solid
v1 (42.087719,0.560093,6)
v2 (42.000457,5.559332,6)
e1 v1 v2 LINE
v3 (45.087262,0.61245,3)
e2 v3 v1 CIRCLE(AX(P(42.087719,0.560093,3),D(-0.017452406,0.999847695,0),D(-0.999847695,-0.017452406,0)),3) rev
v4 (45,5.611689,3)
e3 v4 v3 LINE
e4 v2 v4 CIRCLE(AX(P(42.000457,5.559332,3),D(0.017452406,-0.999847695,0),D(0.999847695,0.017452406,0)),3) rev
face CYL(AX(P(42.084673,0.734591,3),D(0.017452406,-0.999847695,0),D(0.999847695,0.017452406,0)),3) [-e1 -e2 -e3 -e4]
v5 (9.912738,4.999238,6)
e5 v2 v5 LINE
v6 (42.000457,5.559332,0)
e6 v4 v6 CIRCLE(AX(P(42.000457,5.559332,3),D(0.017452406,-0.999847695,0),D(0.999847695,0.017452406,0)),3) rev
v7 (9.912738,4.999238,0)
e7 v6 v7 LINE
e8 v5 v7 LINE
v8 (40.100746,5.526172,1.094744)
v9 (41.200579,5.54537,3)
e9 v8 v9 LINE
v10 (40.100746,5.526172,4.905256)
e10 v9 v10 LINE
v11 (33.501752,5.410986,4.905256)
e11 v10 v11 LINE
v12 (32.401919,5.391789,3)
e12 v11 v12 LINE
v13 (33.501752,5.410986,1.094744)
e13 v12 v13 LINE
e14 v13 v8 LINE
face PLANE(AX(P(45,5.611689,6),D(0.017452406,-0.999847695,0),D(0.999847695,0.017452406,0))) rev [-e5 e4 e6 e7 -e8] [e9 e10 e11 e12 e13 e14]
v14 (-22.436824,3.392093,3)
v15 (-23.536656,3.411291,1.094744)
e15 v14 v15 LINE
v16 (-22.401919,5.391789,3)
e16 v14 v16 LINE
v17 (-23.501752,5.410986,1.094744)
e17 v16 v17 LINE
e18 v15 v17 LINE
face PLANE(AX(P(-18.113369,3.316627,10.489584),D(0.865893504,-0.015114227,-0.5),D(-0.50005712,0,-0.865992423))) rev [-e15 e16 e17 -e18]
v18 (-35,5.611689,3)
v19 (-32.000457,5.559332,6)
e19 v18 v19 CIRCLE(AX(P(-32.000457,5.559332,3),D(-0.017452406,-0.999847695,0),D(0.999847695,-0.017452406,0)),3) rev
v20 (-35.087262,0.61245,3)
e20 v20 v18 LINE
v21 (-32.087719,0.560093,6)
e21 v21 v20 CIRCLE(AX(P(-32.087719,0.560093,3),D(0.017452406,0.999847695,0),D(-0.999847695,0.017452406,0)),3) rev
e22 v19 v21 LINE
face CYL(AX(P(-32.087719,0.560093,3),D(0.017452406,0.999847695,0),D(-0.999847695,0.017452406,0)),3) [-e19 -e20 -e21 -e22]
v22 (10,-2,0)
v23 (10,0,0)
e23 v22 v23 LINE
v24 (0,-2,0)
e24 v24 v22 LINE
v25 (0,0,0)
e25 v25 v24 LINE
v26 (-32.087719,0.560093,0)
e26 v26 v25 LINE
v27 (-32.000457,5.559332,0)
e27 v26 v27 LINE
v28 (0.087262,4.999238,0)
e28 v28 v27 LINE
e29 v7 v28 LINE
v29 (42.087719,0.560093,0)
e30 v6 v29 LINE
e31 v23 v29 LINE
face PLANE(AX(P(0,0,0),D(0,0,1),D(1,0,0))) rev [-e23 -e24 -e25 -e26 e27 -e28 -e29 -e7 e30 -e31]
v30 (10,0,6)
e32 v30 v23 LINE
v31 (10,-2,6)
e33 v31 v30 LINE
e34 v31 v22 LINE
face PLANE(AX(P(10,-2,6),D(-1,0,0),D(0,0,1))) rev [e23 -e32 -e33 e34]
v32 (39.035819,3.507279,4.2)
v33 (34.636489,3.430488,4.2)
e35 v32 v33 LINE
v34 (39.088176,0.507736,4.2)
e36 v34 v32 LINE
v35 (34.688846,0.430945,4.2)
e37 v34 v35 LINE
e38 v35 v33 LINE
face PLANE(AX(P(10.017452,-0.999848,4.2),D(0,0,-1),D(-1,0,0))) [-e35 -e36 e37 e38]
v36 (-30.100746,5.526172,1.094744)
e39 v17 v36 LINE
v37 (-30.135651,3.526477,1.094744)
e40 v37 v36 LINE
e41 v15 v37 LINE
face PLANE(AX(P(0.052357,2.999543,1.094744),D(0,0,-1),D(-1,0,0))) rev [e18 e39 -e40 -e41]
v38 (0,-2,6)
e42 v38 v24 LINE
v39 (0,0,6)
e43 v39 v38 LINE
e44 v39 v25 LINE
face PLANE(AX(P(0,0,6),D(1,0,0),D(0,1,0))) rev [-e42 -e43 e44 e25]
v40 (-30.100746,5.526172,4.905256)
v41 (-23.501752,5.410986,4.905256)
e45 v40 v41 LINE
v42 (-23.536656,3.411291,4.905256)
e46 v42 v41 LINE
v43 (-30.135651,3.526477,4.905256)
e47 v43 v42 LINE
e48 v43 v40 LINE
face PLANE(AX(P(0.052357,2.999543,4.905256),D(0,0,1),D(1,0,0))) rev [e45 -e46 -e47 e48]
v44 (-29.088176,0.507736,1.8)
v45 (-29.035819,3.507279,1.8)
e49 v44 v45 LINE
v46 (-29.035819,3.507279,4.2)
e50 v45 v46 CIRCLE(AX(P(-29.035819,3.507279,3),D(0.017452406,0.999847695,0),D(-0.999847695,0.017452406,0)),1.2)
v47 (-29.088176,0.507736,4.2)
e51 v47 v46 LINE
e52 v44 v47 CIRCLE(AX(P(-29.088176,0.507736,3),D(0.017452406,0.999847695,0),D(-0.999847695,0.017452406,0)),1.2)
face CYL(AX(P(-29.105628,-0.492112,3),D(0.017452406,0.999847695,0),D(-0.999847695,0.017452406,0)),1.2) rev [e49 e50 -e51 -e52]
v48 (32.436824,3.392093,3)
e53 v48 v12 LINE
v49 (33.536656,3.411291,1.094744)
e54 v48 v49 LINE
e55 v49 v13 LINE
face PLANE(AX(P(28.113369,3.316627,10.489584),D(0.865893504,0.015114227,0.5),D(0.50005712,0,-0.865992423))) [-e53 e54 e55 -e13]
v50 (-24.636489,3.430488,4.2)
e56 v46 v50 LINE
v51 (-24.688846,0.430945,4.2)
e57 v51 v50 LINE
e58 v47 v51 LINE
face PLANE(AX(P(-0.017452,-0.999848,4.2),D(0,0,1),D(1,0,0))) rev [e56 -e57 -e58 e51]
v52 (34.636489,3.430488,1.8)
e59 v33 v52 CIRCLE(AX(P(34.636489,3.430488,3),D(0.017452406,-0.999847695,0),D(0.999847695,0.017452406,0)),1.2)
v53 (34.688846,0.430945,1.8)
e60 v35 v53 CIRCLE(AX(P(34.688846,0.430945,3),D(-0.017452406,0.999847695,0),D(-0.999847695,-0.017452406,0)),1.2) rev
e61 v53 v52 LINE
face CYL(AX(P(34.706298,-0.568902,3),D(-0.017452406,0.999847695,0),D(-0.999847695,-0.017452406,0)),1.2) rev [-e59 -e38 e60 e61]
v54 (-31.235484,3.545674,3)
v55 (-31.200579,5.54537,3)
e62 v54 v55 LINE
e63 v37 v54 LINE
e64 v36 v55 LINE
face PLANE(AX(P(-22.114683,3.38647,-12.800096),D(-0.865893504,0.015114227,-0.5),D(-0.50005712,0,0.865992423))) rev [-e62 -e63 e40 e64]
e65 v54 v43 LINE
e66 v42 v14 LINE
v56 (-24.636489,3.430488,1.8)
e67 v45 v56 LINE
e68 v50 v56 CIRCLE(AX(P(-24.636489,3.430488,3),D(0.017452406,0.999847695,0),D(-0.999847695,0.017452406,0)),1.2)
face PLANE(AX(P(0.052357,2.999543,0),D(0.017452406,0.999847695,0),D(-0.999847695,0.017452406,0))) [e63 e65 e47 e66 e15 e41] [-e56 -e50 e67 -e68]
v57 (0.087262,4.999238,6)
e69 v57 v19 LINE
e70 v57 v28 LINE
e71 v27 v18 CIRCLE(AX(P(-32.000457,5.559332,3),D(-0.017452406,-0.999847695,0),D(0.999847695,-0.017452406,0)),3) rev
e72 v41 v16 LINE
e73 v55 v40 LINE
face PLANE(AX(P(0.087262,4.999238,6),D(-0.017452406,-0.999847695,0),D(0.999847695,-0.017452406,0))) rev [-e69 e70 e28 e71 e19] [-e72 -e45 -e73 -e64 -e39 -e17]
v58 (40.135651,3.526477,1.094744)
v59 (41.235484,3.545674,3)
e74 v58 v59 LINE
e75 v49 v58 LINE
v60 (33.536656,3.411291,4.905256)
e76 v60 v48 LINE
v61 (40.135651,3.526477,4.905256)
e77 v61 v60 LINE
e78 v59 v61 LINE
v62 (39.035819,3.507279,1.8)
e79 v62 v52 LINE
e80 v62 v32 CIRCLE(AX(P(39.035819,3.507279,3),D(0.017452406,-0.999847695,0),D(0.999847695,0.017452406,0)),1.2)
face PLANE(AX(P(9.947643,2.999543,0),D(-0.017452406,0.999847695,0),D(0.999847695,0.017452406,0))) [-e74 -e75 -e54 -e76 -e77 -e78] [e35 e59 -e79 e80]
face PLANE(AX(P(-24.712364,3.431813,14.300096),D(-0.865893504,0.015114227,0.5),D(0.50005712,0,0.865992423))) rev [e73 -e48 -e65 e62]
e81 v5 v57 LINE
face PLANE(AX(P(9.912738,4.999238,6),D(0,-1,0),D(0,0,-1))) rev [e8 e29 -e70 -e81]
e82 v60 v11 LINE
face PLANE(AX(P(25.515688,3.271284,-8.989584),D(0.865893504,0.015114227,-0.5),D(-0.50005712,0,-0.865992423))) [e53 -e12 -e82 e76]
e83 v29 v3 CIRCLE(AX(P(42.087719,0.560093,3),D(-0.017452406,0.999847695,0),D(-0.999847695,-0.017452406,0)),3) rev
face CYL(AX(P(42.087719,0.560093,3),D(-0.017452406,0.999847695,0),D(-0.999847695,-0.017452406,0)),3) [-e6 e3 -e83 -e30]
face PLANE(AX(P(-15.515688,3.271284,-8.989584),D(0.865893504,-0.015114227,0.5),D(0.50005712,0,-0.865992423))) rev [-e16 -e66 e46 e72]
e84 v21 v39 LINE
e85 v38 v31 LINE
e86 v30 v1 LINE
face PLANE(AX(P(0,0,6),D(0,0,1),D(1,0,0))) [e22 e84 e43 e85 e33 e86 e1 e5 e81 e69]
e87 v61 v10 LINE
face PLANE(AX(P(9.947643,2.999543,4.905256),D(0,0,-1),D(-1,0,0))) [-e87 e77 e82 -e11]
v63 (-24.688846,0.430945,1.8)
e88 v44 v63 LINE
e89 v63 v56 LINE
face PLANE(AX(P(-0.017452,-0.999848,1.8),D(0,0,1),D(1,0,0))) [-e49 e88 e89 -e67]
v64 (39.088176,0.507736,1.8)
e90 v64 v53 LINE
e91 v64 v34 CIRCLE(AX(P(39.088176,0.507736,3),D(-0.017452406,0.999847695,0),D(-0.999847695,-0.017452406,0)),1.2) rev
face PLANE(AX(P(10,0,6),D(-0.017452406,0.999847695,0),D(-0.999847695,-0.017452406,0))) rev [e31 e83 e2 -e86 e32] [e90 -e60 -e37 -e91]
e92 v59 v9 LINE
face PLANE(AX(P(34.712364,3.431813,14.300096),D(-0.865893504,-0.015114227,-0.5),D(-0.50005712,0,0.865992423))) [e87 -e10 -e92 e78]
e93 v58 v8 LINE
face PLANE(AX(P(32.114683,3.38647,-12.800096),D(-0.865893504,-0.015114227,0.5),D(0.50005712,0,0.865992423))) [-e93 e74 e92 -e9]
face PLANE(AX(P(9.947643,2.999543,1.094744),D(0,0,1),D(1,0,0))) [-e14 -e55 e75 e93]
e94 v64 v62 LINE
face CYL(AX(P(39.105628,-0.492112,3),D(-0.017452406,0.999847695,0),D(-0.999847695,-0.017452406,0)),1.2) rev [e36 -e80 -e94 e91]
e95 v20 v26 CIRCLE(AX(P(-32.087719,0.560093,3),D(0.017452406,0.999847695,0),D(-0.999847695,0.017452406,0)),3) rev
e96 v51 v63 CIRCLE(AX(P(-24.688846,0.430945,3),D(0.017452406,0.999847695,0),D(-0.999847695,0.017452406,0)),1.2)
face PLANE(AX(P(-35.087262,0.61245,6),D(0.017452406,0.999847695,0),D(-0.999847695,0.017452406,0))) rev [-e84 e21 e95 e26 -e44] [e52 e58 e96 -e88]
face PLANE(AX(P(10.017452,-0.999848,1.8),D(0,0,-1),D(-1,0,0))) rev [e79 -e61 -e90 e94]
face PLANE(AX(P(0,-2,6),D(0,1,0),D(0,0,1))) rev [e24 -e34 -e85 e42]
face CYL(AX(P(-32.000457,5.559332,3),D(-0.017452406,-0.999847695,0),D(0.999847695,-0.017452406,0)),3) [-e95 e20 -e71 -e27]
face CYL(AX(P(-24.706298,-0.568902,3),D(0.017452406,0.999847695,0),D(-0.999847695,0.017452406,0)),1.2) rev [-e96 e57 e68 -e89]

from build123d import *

# Parameters (mm, degrees)
BOSS_EXTRUDE1_DEPTH = 6
CUT_EXTRUDE1_DEPTH  = 6
CUT_EXTRUDE3_DEPTH  = 2
FILLET1_R           = 3


with BuildPart() as part:
    # Sketch1 → Boss-Extrude1 (new body)
    with BuildSketch(Plane.XY):
        Polygon((10, 0), (45.087262032, 0.612450437), (45, 5.611688913), (9.912737968, 4.999238476), (0.087262032, 4.999238476), (-35, 5.611688913), (-35.087262032, 0.612450437), (0, 0), (0, -2), (10, -2), align=None)
    extrude(amount=BOSS_EXTRUDE1_DEPTH)

    # Sketch2 → Cut-Extrude1 (cut)
    with BuildSketch(Plane(origin=(0.087262032, 4.999238476, 0), x_dir=(0.9998476951563913, -0.017452406437283737, 0), z_dir=(0.017452406437283737, 0.9998476951563913, 0))):
        with BuildLine():
            Line((-29.092606806, -4.2), (-24.692606806, -4.2))
            ThreePointArc((-24.692606806, -4.2), (-23.492606806, -3), (-24.692606806, -1.8))
            Line((-24.692606806, -1.8), (-29.092606806, -1.8))
            ThreePointArc((-29.092606806, -1.8), (-30.292606806, -3), (-29.092606806, -4.2))
        make_face()
    cut_extrude1 = extrude(amount=-CUT_EXTRUDE1_DEPTH, mode=Mode.SUBTRACT)

    # Sketch2<3> → Cut-Extrude3 (cut)
    with BuildSketch(Plane(origin=(0.087262032, 4.999238476, 0), x_dir=(0.9998476951563913, -0.017452406437283737, 0), z_dir=(0.017452406437283737, 0.9998476951563913, 0))):
        Polygon((-22.492606806, -3), (-23.592606806, -1.094744112), (-30.192606806, -1.094744112), (-31.292606806, -3), (-30.192606806, -4.905255888), (-23.592606806, -4.905255888), align=None)
        with BuildLine():
            ThreePointArc((-24.692606806, -4.2), (-23.492606806, -3), (-24.692606806, -1.8))
            Line((-24.692606806, -1.8), (-29.092606806, -1.8))
            ThreePointArc((-29.092606806, -1.8), (-30.292606806, -3), (-29.092606806, -4.2))
            Line((-29.092606806, -4.2), (-24.692606806, -4.2))
        make_face(mode=Mode.SUBTRACT)
    cut_extrude3 = extrude(amount=-CUT_EXTRUDE3_DEPTH, mode=Mode.SUBTRACT)

    # Mirror1: Cut-Extrude1, Cut-Extrude3 across plane
    add(cut_extrude1.mirror(Plane(origin=(5, 0, 0), x_dir=(0, 0, 1), z_dir=(1, 0, 0))), mode=Mode.SUBTRACT)
    add(cut_extrude3.mirror(Plane(origin=(5, 0, 0), x_dir=(0, 0, 1), z_dir=(1, 0, 0))), mode=Mode.SUBTRACT)

    # Fillet1
    fillet1_edges = [part.edges().sort_by_distance(p)[0] for p in [
        (45.043631016, 3.112069675, 0),
        (45.043631016, 3.112069675, 6),
        (-35.043631016, 3.112069675, 0),
        (-35.043631016, 3.112069675, 6),
    ]]
    fillet(fillet1_edges, radius=FILLET1_R - 0.0001)  # a hair under: the kernel refuses the full size


solid = part.part
